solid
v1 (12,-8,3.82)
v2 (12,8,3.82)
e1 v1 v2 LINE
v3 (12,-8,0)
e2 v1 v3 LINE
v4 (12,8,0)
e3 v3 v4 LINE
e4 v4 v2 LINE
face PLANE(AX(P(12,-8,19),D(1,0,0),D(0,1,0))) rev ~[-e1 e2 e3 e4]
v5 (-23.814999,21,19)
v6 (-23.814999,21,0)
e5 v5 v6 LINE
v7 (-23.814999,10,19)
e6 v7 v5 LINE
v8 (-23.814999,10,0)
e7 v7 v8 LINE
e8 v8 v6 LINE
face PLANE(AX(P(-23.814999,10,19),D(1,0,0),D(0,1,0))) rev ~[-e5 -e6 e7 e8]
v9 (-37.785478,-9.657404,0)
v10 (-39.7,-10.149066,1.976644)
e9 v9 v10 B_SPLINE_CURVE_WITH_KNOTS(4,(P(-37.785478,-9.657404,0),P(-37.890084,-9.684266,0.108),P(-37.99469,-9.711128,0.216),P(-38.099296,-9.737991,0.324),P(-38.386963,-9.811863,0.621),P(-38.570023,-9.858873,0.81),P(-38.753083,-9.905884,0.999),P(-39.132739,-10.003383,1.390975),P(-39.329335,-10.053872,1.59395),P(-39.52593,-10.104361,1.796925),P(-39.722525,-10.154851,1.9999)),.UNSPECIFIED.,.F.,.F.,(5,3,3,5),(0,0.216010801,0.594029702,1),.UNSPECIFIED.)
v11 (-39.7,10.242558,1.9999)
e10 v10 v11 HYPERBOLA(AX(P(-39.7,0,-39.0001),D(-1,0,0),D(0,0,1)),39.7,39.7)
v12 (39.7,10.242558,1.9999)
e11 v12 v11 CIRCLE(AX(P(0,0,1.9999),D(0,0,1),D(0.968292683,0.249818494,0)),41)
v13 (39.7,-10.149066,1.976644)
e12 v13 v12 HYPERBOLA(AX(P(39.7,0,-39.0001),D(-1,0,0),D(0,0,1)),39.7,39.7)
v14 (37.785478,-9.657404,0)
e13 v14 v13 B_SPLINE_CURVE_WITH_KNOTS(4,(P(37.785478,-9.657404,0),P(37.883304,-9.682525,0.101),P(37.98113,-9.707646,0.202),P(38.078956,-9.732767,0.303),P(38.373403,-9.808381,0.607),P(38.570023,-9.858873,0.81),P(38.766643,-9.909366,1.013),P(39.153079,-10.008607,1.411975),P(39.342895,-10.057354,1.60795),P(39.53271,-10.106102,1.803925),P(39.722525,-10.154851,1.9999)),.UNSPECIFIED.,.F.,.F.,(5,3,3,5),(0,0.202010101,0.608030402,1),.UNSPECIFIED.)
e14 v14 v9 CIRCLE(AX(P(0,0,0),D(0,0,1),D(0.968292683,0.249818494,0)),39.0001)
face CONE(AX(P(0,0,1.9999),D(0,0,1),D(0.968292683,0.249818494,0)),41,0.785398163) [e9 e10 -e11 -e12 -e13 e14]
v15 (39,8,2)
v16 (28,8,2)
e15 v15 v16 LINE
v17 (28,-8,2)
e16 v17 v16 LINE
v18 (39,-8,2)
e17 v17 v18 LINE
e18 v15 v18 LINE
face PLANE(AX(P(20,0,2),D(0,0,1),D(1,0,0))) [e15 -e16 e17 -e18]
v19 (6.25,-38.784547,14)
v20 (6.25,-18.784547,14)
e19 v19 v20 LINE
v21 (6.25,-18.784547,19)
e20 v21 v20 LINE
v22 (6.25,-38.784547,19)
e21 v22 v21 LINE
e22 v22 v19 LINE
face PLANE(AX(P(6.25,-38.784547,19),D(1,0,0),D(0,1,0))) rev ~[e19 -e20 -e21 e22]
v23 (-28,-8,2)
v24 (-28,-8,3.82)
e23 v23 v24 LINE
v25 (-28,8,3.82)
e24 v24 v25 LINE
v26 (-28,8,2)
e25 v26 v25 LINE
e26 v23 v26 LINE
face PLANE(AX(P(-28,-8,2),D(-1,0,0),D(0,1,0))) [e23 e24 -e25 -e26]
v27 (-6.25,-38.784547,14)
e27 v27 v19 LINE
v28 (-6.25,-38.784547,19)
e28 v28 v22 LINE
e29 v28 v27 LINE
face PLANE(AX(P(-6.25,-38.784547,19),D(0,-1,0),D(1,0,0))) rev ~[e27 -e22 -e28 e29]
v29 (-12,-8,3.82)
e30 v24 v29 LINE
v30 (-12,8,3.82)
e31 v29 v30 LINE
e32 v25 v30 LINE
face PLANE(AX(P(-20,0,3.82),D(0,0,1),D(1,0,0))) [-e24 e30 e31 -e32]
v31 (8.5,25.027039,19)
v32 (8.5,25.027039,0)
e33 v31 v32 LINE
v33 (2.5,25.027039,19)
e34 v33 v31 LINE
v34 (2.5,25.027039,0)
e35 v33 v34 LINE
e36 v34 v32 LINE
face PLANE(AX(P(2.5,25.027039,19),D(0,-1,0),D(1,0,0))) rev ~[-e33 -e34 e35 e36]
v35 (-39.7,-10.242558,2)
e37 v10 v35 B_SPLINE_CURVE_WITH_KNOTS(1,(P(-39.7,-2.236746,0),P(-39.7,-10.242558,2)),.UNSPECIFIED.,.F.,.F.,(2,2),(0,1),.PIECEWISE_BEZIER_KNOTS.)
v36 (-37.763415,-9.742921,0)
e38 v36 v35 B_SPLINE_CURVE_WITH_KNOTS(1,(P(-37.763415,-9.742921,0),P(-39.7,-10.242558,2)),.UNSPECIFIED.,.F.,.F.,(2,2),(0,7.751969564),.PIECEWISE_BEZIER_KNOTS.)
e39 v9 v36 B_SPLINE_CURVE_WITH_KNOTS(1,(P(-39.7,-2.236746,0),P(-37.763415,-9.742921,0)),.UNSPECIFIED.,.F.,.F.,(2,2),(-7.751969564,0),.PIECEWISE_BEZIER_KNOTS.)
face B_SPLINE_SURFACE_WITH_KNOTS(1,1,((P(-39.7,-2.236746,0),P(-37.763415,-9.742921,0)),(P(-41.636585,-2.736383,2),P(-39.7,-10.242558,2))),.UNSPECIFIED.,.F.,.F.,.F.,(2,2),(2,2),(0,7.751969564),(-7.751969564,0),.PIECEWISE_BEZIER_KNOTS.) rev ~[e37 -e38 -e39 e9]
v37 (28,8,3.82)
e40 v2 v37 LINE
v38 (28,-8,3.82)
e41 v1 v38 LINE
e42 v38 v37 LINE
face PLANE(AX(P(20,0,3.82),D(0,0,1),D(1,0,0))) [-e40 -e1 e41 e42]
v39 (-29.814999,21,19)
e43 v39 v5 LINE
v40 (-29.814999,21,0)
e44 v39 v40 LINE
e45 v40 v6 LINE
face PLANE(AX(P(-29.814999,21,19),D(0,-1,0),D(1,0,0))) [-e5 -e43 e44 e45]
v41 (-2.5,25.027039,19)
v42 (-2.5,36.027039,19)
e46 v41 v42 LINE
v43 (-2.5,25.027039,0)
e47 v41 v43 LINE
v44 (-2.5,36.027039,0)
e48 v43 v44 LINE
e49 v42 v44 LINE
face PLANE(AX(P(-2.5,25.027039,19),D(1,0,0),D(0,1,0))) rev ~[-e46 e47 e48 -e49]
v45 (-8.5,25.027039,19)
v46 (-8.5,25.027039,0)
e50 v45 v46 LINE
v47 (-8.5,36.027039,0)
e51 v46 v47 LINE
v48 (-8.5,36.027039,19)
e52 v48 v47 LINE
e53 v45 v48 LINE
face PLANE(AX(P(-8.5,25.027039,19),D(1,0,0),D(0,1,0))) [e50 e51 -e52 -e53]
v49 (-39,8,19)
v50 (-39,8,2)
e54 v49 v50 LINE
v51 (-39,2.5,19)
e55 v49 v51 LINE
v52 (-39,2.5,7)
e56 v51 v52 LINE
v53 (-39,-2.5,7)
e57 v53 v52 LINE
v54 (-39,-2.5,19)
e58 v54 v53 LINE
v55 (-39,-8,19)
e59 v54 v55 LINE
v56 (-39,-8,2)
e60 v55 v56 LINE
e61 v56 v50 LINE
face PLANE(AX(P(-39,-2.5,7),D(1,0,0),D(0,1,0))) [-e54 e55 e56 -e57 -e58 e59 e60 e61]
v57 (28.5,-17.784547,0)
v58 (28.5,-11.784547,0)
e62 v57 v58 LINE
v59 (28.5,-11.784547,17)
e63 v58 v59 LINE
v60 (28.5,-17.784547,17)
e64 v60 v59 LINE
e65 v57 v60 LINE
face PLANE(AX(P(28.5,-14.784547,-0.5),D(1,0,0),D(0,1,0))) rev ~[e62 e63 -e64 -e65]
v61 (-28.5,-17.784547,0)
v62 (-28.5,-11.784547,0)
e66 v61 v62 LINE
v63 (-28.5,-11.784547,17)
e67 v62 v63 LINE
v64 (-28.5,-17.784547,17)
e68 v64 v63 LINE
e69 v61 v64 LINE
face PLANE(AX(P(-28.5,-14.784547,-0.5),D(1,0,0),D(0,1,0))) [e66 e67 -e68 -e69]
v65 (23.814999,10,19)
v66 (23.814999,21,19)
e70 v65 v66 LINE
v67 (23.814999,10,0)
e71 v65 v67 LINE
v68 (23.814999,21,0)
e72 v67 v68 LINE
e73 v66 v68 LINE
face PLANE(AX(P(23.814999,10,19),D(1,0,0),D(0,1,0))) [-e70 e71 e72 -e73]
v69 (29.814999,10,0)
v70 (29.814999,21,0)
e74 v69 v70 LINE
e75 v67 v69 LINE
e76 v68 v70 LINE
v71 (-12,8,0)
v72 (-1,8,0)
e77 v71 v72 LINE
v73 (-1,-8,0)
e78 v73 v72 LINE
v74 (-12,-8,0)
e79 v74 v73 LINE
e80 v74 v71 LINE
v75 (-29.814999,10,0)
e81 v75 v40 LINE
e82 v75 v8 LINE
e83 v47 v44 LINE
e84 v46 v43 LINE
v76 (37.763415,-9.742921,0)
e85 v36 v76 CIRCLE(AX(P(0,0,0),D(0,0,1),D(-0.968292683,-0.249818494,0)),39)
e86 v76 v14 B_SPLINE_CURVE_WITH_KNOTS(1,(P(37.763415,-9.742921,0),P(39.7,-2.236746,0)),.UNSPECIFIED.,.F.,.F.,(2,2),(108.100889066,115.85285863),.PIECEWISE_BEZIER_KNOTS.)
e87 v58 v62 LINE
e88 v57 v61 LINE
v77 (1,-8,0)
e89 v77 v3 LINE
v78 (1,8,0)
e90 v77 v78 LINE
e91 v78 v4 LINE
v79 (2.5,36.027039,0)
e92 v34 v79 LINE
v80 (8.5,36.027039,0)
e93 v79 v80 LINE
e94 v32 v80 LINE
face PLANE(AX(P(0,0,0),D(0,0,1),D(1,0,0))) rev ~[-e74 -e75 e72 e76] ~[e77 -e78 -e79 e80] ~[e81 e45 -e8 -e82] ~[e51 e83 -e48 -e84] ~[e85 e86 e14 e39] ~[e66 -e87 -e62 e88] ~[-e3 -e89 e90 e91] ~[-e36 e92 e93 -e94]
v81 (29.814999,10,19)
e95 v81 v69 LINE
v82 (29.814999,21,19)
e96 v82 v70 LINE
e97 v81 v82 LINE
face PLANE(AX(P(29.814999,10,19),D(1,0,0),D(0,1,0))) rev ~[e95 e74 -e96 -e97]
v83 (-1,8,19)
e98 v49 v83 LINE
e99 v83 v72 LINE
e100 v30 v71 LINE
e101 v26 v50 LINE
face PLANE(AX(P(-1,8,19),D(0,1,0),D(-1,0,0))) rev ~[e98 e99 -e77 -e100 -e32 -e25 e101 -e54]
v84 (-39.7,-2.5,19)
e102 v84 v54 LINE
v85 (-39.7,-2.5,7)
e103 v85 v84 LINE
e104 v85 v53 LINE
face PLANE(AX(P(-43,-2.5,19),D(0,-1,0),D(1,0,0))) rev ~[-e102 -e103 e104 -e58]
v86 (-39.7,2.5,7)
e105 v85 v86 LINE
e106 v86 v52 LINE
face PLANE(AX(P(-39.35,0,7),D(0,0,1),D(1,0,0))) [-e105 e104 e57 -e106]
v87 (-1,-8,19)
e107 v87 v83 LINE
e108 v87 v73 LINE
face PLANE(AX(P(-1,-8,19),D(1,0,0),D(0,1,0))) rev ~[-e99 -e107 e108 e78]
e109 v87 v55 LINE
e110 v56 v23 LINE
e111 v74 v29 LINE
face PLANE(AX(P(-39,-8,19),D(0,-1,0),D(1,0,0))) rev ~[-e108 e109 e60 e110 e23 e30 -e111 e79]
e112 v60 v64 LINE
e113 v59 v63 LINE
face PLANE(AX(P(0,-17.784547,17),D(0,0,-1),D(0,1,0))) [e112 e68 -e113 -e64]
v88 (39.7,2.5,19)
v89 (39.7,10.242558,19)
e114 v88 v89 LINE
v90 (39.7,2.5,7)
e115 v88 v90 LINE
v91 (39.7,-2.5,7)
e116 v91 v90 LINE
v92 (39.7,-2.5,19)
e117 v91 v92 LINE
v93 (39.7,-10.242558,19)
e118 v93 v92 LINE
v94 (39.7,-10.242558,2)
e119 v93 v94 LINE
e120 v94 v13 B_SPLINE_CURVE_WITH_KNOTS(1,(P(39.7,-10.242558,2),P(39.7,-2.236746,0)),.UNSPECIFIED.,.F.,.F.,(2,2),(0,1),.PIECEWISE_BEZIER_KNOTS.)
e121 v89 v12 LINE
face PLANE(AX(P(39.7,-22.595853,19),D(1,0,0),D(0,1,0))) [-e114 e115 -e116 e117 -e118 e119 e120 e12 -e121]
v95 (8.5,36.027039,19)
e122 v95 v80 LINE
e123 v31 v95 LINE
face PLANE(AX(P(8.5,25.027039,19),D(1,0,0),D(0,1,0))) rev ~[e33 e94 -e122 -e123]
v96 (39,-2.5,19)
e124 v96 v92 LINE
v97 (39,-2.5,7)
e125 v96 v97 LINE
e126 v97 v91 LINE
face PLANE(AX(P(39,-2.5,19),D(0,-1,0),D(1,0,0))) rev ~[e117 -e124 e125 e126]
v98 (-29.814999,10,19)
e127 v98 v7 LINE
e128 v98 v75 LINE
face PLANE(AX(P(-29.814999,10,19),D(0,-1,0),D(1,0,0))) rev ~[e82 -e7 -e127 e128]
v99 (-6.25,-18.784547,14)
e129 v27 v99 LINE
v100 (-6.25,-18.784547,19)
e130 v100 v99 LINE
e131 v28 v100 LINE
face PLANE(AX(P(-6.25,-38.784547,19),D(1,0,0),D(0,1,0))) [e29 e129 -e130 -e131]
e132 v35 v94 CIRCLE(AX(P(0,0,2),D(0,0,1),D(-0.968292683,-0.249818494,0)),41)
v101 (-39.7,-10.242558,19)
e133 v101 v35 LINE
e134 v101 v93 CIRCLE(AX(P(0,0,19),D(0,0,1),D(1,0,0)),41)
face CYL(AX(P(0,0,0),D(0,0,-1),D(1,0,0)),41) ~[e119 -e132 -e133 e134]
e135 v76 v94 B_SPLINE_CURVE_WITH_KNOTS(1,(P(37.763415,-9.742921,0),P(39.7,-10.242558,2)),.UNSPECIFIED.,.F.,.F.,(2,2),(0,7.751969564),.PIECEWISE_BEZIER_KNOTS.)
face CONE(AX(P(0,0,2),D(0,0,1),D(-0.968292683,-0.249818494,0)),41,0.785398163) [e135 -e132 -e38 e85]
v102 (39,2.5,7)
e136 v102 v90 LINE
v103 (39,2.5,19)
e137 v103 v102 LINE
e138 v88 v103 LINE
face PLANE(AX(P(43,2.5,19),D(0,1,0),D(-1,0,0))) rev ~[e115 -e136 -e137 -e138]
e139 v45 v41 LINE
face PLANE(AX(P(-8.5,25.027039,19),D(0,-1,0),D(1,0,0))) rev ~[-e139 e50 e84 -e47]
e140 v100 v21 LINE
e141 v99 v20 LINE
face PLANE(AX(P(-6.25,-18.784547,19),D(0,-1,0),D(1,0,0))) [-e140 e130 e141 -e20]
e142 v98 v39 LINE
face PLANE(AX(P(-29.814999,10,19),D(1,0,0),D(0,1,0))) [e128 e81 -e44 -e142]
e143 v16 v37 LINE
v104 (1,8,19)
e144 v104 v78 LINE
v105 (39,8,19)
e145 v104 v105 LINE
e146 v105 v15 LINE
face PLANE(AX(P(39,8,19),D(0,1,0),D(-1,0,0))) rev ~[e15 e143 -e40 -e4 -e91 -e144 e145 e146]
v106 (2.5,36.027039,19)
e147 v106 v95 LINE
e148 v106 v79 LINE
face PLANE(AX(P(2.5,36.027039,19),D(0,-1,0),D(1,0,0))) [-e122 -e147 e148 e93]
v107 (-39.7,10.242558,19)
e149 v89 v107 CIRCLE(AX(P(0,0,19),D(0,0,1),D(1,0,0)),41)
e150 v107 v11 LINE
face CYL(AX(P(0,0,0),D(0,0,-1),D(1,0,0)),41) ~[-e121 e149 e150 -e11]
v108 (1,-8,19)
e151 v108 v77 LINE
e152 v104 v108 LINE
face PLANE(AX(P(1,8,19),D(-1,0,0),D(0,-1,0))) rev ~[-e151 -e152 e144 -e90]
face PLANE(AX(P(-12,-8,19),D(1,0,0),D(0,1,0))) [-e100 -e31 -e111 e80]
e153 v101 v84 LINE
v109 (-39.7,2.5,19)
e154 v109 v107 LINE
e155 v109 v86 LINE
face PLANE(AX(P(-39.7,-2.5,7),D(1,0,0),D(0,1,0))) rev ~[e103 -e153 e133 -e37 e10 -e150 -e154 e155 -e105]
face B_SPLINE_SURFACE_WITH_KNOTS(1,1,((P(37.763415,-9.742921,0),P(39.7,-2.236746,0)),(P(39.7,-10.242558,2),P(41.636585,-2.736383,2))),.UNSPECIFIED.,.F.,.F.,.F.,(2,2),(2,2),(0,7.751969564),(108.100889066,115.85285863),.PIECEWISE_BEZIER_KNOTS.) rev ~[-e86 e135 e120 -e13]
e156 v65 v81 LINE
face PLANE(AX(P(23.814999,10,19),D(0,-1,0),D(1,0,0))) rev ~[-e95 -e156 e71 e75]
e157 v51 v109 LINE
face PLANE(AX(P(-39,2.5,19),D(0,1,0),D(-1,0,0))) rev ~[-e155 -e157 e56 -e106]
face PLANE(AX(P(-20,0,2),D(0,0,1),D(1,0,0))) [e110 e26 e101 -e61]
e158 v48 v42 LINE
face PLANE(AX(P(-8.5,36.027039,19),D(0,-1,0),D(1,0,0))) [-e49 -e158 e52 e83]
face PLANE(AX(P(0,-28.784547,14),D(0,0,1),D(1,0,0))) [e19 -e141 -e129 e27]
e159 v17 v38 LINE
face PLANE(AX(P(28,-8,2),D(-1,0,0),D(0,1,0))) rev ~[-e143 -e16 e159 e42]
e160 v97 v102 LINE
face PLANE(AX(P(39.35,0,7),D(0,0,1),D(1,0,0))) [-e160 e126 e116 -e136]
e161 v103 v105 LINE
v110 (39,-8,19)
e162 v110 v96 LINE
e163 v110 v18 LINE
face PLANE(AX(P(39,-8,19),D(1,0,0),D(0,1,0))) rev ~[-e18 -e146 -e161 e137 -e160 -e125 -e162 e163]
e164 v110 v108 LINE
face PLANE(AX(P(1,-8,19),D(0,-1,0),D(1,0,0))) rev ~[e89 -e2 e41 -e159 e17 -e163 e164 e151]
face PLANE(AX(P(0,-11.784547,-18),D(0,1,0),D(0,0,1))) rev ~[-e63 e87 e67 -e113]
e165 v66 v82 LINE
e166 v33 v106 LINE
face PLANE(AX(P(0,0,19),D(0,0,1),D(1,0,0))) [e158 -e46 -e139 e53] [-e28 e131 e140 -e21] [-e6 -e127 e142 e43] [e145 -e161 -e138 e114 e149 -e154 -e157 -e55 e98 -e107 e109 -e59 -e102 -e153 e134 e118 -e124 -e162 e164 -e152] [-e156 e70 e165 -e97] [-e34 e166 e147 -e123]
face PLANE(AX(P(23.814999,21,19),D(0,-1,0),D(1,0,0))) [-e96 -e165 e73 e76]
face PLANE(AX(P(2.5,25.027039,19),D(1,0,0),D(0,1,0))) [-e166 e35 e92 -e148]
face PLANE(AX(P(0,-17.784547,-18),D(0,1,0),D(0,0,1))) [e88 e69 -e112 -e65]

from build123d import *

# Parameters (mm, degrees)
F0_R        = 41
F1_DEPTH    = 19
F3_DEPTH    = 17
F4_W        = 6
F4_H        = 11
F4_W_2      = 11
F4_H_2      = 16
F4_W_3      = 10.7800960541
F4_H_3      = 45.1917052269
F5_DEPTH    = 19.001
F7_START    = -12
F6_W        = 0.7
F6_H        = 5
F7_DEPTH    = 5
F8_W        = 16
F8_H        = 16
F9_DEPTH    = 1.82
F10_C1_SIZE = 2
F10_C2_SIZE = 1.9999
F11_W       = 12.5
F11_H       = 20
F12_DEPTH   = 5
F13_W       = 6
F13_H       = 35
F14_DEPTH   = 28.5


# Not quite as in the source:
# - a fillet or chamfer is up to 0.001 mm smaller than in the source, because OpenCascade refuses the exact size


with BuildPart() as f1:
    # F0 (on Top) → F1 (new body)
    with BuildSketch(Plane.XY):
        Circle(F0_R)
    extrude(amount=F1_DEPTH)

    # F2 (on face) → F3 (cut)
    with BuildSketch(Plane.XY.offset(19)):
        Polygon((39, 2.5), (39, 8), (1, 8), (1, -8), (39, -8), (39, -2.5), align=None)
        Polygon((-39, 8), (-39, 2.5), (-39, -2.5), (-39, -8), (-1, -8), (-1, 8), align=None)
        with BuildLine():
            Line((43, 2.5), (40.9237095093, 2.5))
            ThreePointArc((40.9237095093, 2.5), (40.9809229391, 1.2505818885), (41, 0))
            ThreePointArc((41, 0), (40.9809229391, -1.2505818885), (40.9237095093, -2.5))
            Line((40.9237095093, -2.5), (43, -2.5))
            Line((43, -2.5), (43, 2.5))
        make_face()
        with BuildLine():
            ThreePointArc((-40.9237095093, -2.5), (-41, 0), (-40.9237095093, 2.5))
            Line((-40.9237095093, 2.5), (-43, 2.5))
            Line((-43, 2.5), (-43, -2.5))
            Line((-43, -2.5), (-40.9237095093, -2.5))
        make_face()
        with BuildLine():
            Line((40.9237095093, 2.5), (39, 2.5))
            Line((39, 2.5), (39, -2.5))
            Line((39, -2.5), (40.9237095093, -2.5))
            ThreePointArc((40.9237095093, -2.5), (40.9809229391, -1.2505818885), (41, 0))
            ThreePointArc((41, 0), (40.9809229391, 1.2505818885), (40.9237095093, 2.5))
        make_face()
        with BuildLine():
            Line((-39, 2.5), (-40.9237095093, 2.5))
            ThreePointArc((-40.9237095093, 2.5), (-41, 0), (-40.9237095093, -2.5))
            Line((-40.9237095093, -2.5), (-39, -2.5))
            Line((-39, -2.5), (-39, 2.5))
        make_face()
    extrude(amount=-F3_DEPTH, mode=Mode.SUBTRACT)

    # F4 (on face) → F5 (cut, through all)
    with BuildSketch(Plane.XY.offset(19)):
        with Locations((-26.8149985671, 15.5)):
            Rectangle(F4_W, F4_H)
        with Locations((26.8149985671, 15.5)):
            Rectangle(F4_W, F4_H)
        with Locations((-5.5, 30.5270385295)):
            Rectangle(F4_W, F4_H)
        with Locations((5.5, 30.5270385295)):
            Rectangle(F4_W, F4_H)
        with Locations((-6.5, 0)):
            Rectangle(F4_W_2, F4_H_2)
        with Locations((6.5, 0)):
            Rectangle(F4_W_2, F4_H_2)
        with Locations((-45.090048027, 0)):
            Rectangle(F4_W_3, F4_H_3)
        with Locations((45.090048027, 0)):
            Rectangle(F4_W_3, F4_H_3)
    extrude(amount=-F5_DEPTH, mode=Mode.SUBTRACT)

    # F6 (on face) → F7 (join)
    with BuildSketch(Plane.XY.offset(19).offset(F7_START)):
        with Locations((-39.35, 0)):
            Rectangle(F6_W, F6_H)
        with Locations((39.35, 0)):
            Rectangle(F6_W, F6_H)
    extrude(amount=-F7_DEPTH)

    # F8 (on face) → F9 (join)
    with BuildSketch(Plane.XY.offset(2)):
        with Locations((-20, 0)):
            Rectangle(F8_W, F8_H)
        with Locations((20, 0)):
            Rectangle(F8_W, F8_H)
    extrude(amount=F9_DEPTH)

    # F10: chamfer of 2 on 2 edges, made by hand

    # F10_c1
    f10_c1_edges = [f1.edges().sort_by_distance(p)[0] for p in [
        (0, -41, 0),
    ]]
    chamfer(f10_c1_edges, length=F10_C1_SIZE)

    # F10_c2 (size 2 in the source; OpenCascade refuses exactly that, so slightly less here)
    f10_c2_edges = [f1.edges().sort_by_distance(p)[0] for p in [
        (0, 41, 0),
    ]]
    chamfer(f10_c2_edges, length=F10_C2_SIZE)

    # F11 (on face) → F12 (cut)
    with BuildSketch(Plane.XY.offset(19)):
        with Locations((0, -28.7845470011)):
            Rectangle(F11_W, F11_H)
    extrude(amount=-F12_DEPTH, mode=Mode.SUBTRACT)

    # F13 (on Right) → F14 (cut, symmetric)
    with BuildSketch(Plane.YZ):
        with Locations((-14.7845470011, -0.5)):
            Rectangle(F13_W, F13_H)
    extrude(amount=F14_DEPTH, both=True, mode=Mode.SUBTRACT)


solid = f1.part
